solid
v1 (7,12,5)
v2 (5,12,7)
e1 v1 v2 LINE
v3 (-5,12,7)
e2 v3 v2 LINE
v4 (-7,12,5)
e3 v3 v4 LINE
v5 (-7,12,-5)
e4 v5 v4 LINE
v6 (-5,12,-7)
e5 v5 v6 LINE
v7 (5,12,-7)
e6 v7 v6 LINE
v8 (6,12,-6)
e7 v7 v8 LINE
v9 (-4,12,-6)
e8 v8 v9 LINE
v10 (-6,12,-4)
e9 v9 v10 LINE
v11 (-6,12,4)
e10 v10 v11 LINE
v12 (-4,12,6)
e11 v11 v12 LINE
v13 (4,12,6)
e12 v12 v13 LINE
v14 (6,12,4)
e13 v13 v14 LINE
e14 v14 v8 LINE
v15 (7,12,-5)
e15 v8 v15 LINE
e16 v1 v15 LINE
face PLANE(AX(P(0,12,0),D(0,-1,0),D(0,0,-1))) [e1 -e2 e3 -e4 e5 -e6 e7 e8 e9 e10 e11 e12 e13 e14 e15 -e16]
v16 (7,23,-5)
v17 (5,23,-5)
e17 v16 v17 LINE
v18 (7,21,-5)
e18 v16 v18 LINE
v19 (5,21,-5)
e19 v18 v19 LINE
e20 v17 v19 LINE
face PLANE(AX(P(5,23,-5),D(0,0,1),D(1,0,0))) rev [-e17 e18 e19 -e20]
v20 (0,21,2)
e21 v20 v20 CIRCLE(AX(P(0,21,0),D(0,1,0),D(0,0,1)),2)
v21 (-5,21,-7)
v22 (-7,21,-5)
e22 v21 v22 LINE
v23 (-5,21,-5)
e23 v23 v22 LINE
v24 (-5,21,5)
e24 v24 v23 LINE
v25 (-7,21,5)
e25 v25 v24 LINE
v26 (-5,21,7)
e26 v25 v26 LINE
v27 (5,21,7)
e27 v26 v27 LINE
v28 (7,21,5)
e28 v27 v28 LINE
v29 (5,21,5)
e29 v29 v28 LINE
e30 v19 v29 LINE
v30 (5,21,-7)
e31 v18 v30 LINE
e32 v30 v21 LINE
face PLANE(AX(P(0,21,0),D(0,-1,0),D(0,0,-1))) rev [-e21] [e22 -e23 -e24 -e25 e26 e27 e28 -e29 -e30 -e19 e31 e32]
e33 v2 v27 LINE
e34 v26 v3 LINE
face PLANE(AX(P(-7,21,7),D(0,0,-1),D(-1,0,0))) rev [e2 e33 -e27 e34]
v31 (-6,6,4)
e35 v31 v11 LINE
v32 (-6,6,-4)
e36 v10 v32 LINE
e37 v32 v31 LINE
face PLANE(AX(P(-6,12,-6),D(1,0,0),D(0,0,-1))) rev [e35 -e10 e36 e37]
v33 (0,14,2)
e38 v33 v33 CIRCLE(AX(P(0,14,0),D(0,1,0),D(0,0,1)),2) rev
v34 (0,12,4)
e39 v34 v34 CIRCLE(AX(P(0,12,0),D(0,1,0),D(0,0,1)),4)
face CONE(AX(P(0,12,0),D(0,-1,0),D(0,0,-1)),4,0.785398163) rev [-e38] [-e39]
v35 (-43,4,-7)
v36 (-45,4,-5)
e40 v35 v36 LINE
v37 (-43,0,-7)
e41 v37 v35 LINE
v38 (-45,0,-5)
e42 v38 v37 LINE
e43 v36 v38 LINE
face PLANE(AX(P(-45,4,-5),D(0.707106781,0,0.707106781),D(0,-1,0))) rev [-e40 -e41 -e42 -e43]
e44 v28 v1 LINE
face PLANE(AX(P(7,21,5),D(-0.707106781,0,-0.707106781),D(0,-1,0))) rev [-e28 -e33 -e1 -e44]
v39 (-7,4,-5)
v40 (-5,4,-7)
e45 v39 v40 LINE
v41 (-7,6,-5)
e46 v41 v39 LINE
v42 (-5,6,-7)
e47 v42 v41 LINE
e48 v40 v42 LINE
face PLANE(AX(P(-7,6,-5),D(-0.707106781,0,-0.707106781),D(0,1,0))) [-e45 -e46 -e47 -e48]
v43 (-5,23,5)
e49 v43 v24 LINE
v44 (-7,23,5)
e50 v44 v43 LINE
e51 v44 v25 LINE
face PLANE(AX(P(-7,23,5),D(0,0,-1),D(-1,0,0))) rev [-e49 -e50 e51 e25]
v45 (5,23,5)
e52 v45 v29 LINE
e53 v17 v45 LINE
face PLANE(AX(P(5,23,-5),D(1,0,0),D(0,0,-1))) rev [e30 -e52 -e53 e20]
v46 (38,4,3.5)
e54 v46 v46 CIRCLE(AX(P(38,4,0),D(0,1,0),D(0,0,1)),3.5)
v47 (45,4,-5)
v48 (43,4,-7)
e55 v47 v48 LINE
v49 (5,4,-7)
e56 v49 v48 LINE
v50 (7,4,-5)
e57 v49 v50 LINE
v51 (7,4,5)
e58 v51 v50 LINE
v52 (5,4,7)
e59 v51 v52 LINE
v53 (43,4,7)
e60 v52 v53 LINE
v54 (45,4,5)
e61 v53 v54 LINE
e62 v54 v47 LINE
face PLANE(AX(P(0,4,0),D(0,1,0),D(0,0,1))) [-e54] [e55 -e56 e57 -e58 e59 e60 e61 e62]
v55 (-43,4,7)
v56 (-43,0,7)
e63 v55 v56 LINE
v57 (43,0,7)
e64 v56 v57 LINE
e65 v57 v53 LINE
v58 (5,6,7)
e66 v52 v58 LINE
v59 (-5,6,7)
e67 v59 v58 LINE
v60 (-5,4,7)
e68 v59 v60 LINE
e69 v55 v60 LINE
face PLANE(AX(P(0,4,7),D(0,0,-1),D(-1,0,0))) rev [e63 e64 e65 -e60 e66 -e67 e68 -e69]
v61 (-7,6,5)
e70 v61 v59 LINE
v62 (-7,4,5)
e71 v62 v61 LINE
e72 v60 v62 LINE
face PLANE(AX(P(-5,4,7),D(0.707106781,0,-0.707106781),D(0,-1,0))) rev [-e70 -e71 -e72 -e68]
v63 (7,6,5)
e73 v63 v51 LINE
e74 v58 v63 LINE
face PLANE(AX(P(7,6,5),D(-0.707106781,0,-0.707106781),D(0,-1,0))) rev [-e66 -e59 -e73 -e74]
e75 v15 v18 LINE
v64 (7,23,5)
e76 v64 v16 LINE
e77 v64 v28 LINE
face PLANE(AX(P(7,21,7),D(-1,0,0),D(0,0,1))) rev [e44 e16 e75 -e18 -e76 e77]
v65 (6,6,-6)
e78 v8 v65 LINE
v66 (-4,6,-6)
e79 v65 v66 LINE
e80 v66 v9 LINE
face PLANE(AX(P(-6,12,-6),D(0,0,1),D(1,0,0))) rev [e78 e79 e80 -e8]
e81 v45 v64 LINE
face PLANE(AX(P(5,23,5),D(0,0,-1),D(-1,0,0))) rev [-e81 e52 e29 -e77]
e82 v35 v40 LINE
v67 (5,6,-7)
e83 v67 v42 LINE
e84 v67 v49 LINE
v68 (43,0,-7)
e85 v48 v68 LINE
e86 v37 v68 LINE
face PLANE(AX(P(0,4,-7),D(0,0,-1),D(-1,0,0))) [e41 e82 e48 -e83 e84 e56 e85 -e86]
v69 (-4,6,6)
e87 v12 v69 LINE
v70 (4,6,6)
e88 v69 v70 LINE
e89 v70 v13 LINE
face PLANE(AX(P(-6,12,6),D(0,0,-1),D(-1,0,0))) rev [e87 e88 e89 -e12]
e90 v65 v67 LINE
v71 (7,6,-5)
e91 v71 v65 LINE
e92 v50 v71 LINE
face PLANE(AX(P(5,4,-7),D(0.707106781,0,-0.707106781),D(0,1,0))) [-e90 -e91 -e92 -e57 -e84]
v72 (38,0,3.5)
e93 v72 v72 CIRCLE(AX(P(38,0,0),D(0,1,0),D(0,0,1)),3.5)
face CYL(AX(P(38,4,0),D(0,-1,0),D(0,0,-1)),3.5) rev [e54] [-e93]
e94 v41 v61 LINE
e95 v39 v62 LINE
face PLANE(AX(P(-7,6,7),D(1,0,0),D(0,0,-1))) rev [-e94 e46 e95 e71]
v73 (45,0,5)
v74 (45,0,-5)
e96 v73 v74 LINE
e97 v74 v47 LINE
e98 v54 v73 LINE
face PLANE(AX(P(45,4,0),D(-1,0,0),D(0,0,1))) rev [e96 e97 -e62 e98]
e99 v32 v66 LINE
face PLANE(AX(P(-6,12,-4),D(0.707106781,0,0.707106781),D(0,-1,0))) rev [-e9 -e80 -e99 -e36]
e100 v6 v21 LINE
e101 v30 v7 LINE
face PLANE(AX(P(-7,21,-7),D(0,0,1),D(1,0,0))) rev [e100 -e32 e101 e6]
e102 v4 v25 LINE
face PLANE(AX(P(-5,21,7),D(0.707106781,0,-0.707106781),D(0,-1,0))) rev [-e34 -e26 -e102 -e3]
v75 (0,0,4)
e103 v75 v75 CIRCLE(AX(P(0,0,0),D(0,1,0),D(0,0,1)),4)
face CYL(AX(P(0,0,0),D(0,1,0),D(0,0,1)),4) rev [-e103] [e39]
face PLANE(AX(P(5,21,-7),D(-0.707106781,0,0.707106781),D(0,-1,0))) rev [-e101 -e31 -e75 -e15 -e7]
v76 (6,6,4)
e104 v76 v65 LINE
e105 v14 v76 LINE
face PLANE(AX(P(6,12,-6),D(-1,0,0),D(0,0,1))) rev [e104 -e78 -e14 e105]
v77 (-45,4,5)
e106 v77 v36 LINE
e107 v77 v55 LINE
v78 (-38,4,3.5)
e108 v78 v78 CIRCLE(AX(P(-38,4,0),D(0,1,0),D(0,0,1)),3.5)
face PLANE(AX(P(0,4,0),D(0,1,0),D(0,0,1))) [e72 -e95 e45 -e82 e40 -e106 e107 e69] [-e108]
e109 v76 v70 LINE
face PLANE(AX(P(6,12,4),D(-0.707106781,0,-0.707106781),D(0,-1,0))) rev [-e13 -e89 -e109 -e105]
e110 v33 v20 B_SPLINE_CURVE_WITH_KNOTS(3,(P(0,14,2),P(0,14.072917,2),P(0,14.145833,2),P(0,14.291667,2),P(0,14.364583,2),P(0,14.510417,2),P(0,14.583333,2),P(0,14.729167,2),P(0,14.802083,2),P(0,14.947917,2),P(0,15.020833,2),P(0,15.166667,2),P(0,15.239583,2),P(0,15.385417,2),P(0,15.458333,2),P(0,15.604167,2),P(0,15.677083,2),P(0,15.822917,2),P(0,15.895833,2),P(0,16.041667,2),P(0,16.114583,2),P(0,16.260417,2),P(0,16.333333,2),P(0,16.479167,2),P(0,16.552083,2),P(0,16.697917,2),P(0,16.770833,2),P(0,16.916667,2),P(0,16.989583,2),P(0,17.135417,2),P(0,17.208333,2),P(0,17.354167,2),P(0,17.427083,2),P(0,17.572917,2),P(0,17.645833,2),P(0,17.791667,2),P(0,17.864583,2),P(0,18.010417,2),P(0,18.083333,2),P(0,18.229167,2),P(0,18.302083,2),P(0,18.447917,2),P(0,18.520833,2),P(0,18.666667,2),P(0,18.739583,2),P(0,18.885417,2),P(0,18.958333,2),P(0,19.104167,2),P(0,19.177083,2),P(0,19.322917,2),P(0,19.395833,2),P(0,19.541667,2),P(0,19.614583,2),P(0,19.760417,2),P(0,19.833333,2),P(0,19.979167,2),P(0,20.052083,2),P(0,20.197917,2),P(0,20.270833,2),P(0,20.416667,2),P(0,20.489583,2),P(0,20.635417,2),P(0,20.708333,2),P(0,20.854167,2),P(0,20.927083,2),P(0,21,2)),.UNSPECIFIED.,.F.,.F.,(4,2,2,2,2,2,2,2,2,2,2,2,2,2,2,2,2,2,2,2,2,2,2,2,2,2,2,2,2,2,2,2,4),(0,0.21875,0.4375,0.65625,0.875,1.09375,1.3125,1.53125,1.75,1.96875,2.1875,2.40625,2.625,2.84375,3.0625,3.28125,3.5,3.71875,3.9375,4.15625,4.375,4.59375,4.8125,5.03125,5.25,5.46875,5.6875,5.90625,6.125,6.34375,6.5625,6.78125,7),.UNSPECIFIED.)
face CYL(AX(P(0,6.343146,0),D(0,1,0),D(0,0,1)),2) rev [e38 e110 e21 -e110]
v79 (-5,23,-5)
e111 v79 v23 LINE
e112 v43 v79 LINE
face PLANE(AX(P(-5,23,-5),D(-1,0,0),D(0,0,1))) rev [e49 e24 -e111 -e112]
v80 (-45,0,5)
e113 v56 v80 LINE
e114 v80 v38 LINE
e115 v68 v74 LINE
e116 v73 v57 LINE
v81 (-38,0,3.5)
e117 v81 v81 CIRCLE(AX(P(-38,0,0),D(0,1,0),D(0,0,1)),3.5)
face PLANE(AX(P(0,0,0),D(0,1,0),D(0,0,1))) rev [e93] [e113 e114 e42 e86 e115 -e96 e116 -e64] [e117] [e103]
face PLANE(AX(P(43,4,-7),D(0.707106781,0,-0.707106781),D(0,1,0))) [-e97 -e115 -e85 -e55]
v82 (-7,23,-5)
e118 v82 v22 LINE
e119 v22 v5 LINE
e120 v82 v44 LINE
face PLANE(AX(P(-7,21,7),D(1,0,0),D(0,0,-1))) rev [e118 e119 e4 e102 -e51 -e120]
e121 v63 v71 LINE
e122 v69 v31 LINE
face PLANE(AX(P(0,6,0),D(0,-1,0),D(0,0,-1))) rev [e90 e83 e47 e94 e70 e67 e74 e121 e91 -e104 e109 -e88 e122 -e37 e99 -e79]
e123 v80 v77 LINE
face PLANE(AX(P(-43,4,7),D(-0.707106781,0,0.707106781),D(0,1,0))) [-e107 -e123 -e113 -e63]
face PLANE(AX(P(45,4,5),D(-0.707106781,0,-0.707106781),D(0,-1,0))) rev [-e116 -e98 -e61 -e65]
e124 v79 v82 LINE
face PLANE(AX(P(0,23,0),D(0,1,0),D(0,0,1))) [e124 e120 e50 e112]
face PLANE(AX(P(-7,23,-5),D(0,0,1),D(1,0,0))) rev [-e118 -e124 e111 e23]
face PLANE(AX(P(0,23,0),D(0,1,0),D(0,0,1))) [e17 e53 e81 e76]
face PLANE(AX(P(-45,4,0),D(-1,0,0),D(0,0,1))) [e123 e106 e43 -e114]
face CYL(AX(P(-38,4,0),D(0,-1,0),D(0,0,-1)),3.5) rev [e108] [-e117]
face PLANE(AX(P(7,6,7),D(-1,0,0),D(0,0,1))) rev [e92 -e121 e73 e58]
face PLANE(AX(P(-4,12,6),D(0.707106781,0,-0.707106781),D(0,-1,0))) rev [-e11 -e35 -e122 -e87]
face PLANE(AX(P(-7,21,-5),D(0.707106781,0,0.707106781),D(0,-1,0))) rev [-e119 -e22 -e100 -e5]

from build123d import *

# Parameters (mm, degrees)
SKETCH1_W           = 90
SKETCH1_H           = 14
SKETCH1_R           = 2
SKETCH1_R_2         = 3.5
BOSS_EXTRUDE1_DEPTH = 4
SKETCH2_W           = 14
SKETCH2_H           = 14
BOSS_EXTRUDE2_DEPTH = 2
SKETCH3_W           = 12
SKETCH3_H           = 12
BOSS_EXTRUDE3_DEPTH = 6
SKETCH4_W           = 14
SKETCH4_H           = 14
BOSS_EXTRUDE4_DEPTH = 9
SKETCH5_W           = 2
SKETCH5_H           = 10
BOSS_EXTRUDE5_DEPTH = 2
SKETCH6_R           = 2
CUT_EXTRUDE1_DEPTH  = 9
SKETCH8_R           = 4
SKETCH8_R_2         = 2
CUT_EXTRUDE2_DEPTH  = 48.095647357
CHAMFER1_SIZE       = 2
CHAMFER2_SIZE       = 2


with BuildPart() as part:
    # Sketch1 → Boss-Extrude1 (new body)
    # profile 1 of 2: a face of its own
    with BuildSketch(Plane(origin=(0, 0, 0), x_dir=(1, 0, 0), z_dir=(0, 1, 0))):
        Rectangle(SKETCH1_W, SKETCH1_H)
        Circle(SKETCH1_R, mode=Mode.SUBTRACT)
        with Locations(Location((38, 0, 0), (0, 0, 270))):
            Circle(SKETCH1_R_2, mode=Mode.SUBTRACT)
        with Locations(Location((-38, 0, 0), (0, 0, 270))):
            Circle(SKETCH1_R_2, mode=Mode.SUBTRACT)
    # profile 2 of 2: a face of its own
    with BuildSketch(Plane(origin=(0, 0, 0), x_dir=(1, 0, 0), z_dir=(0, 1, 0))):
        Circle(SKETCH1_R)
    extrude(amount=BOSS_EXTRUDE1_DEPTH)

    # Sketch2 → Boss-Extrude2 (add)
    with BuildSketch(Plane(origin=(0, 4, 0), x_dir=(1, 0, 0), z_dir=(0, 1, 0))):
        Rectangle(SKETCH2_W, SKETCH2_H)
    extrude(amount=BOSS_EXTRUDE2_DEPTH)

    # Sketch3 → Boss-Extrude3 (add)
    with BuildSketch(Plane(origin=(0, 6, 0), x_dir=(1, 0, 0), z_dir=(0, 1, 0))):
        Rectangle(SKETCH3_W, SKETCH3_H)
    extrude(amount=BOSS_EXTRUDE3_DEPTH)

    # Sketch4 → Boss-Extrude4 (add)
    with BuildSketch(Plane(origin=(0, 12, 0), x_dir=(1, 0, 0), z_dir=(0, 1, 0))):
        Rectangle(SKETCH4_W, SKETCH4_H)
    extrude(amount=BOSS_EXTRUDE4_DEPTH)

    # Sketch5 → Boss-Extrude5 (add)
    with BuildSketch(Plane(origin=(0, 21, 0), x_dir=(1, 0, 0), z_dir=(0, 1, 0))):
        with Locations((-6, 0)):
            Rectangle(SKETCH5_W, SKETCH5_H)
        with Locations((6, 0)):
            Rectangle(SKETCH5_W, SKETCH5_H)
    extrude(amount=BOSS_EXTRUDE5_DEPTH)

    # Sketch6 → Cut-Extrude1 (cut)
    with BuildSketch(Plane(origin=(0, 21, 0), x_dir=(1, 0, 0), z_dir=(0, 1, 0))):
        with Locations(Location((0, 0, 0), (0, 0, 270))):
            Circle(SKETCH6_R)
    extrude(amount=-CUT_EXTRUDE1_DEPTH, mode=Mode.SUBTRACT)

    # Sketch8 → Cut-Extrude2 (cut, through all)
    # profile 1 of 2: a face of its own
    with BuildSketch(Plane(origin=(0, 12, 0), x_dir=(1, 0, 0), z_dir=(0, 1, 0))):
        with Locations(Location((0, 0, 0), (0, 0, 270))):
            Circle(SKETCH8_R)
        with Locations(Location((0, 0, 0), (0, 0, 270))):
            Circle(SKETCH8_R_2, mode=Mode.SUBTRACT)
    # profile 2 of 2: a face of its own
    with BuildSketch(Plane(origin=(0, 12, 0), x_dir=(1, 0, 0), z_dir=(0, 1, 0))):
        with Locations(Location((0, 0, 0), (0, 0, 270))):
            Circle(SKETCH8_R_2)
    extrude(amount=-CUT_EXTRUDE2_DEPTH, mode=Mode.SUBTRACT)

    # Chamfer1
    chamfer1_edges = [part.edges().sort_by_distance(p)[0] for p in [
        (7, 5, 7),
        (6, 9, 6),
        (7, 16.5, 7),
        (7, 16.5, -7),
        (7, 5, -7),
        (-7, 5, 7),
        (-7, 5, -7),
        (-6, 9, -6),
        (-6, 9, 6),
        (-7, 16.5, 7),
        (45, 2, 7),
        (-45, 2, 7),
        (-45, 2, -7),
        (45, 2, -7),
        (-7, 16.5, -7),
    ]]
    chamfer(chamfer1_edges, length=CHAMFER1_SIZE - 0.0001)  # a hair under: the kernel refuses the full size

    # Chamfer2
    chamfer2_edges = [part.edges().sort_by_distance(p)[0] for p in [
        (0, 12, -2),
    ]]
    chamfer(chamfer2_edges, length=CHAMFER2_SIZE - 0.0001)  # a hair under: the kernel refuses the full size


solid = part.part
